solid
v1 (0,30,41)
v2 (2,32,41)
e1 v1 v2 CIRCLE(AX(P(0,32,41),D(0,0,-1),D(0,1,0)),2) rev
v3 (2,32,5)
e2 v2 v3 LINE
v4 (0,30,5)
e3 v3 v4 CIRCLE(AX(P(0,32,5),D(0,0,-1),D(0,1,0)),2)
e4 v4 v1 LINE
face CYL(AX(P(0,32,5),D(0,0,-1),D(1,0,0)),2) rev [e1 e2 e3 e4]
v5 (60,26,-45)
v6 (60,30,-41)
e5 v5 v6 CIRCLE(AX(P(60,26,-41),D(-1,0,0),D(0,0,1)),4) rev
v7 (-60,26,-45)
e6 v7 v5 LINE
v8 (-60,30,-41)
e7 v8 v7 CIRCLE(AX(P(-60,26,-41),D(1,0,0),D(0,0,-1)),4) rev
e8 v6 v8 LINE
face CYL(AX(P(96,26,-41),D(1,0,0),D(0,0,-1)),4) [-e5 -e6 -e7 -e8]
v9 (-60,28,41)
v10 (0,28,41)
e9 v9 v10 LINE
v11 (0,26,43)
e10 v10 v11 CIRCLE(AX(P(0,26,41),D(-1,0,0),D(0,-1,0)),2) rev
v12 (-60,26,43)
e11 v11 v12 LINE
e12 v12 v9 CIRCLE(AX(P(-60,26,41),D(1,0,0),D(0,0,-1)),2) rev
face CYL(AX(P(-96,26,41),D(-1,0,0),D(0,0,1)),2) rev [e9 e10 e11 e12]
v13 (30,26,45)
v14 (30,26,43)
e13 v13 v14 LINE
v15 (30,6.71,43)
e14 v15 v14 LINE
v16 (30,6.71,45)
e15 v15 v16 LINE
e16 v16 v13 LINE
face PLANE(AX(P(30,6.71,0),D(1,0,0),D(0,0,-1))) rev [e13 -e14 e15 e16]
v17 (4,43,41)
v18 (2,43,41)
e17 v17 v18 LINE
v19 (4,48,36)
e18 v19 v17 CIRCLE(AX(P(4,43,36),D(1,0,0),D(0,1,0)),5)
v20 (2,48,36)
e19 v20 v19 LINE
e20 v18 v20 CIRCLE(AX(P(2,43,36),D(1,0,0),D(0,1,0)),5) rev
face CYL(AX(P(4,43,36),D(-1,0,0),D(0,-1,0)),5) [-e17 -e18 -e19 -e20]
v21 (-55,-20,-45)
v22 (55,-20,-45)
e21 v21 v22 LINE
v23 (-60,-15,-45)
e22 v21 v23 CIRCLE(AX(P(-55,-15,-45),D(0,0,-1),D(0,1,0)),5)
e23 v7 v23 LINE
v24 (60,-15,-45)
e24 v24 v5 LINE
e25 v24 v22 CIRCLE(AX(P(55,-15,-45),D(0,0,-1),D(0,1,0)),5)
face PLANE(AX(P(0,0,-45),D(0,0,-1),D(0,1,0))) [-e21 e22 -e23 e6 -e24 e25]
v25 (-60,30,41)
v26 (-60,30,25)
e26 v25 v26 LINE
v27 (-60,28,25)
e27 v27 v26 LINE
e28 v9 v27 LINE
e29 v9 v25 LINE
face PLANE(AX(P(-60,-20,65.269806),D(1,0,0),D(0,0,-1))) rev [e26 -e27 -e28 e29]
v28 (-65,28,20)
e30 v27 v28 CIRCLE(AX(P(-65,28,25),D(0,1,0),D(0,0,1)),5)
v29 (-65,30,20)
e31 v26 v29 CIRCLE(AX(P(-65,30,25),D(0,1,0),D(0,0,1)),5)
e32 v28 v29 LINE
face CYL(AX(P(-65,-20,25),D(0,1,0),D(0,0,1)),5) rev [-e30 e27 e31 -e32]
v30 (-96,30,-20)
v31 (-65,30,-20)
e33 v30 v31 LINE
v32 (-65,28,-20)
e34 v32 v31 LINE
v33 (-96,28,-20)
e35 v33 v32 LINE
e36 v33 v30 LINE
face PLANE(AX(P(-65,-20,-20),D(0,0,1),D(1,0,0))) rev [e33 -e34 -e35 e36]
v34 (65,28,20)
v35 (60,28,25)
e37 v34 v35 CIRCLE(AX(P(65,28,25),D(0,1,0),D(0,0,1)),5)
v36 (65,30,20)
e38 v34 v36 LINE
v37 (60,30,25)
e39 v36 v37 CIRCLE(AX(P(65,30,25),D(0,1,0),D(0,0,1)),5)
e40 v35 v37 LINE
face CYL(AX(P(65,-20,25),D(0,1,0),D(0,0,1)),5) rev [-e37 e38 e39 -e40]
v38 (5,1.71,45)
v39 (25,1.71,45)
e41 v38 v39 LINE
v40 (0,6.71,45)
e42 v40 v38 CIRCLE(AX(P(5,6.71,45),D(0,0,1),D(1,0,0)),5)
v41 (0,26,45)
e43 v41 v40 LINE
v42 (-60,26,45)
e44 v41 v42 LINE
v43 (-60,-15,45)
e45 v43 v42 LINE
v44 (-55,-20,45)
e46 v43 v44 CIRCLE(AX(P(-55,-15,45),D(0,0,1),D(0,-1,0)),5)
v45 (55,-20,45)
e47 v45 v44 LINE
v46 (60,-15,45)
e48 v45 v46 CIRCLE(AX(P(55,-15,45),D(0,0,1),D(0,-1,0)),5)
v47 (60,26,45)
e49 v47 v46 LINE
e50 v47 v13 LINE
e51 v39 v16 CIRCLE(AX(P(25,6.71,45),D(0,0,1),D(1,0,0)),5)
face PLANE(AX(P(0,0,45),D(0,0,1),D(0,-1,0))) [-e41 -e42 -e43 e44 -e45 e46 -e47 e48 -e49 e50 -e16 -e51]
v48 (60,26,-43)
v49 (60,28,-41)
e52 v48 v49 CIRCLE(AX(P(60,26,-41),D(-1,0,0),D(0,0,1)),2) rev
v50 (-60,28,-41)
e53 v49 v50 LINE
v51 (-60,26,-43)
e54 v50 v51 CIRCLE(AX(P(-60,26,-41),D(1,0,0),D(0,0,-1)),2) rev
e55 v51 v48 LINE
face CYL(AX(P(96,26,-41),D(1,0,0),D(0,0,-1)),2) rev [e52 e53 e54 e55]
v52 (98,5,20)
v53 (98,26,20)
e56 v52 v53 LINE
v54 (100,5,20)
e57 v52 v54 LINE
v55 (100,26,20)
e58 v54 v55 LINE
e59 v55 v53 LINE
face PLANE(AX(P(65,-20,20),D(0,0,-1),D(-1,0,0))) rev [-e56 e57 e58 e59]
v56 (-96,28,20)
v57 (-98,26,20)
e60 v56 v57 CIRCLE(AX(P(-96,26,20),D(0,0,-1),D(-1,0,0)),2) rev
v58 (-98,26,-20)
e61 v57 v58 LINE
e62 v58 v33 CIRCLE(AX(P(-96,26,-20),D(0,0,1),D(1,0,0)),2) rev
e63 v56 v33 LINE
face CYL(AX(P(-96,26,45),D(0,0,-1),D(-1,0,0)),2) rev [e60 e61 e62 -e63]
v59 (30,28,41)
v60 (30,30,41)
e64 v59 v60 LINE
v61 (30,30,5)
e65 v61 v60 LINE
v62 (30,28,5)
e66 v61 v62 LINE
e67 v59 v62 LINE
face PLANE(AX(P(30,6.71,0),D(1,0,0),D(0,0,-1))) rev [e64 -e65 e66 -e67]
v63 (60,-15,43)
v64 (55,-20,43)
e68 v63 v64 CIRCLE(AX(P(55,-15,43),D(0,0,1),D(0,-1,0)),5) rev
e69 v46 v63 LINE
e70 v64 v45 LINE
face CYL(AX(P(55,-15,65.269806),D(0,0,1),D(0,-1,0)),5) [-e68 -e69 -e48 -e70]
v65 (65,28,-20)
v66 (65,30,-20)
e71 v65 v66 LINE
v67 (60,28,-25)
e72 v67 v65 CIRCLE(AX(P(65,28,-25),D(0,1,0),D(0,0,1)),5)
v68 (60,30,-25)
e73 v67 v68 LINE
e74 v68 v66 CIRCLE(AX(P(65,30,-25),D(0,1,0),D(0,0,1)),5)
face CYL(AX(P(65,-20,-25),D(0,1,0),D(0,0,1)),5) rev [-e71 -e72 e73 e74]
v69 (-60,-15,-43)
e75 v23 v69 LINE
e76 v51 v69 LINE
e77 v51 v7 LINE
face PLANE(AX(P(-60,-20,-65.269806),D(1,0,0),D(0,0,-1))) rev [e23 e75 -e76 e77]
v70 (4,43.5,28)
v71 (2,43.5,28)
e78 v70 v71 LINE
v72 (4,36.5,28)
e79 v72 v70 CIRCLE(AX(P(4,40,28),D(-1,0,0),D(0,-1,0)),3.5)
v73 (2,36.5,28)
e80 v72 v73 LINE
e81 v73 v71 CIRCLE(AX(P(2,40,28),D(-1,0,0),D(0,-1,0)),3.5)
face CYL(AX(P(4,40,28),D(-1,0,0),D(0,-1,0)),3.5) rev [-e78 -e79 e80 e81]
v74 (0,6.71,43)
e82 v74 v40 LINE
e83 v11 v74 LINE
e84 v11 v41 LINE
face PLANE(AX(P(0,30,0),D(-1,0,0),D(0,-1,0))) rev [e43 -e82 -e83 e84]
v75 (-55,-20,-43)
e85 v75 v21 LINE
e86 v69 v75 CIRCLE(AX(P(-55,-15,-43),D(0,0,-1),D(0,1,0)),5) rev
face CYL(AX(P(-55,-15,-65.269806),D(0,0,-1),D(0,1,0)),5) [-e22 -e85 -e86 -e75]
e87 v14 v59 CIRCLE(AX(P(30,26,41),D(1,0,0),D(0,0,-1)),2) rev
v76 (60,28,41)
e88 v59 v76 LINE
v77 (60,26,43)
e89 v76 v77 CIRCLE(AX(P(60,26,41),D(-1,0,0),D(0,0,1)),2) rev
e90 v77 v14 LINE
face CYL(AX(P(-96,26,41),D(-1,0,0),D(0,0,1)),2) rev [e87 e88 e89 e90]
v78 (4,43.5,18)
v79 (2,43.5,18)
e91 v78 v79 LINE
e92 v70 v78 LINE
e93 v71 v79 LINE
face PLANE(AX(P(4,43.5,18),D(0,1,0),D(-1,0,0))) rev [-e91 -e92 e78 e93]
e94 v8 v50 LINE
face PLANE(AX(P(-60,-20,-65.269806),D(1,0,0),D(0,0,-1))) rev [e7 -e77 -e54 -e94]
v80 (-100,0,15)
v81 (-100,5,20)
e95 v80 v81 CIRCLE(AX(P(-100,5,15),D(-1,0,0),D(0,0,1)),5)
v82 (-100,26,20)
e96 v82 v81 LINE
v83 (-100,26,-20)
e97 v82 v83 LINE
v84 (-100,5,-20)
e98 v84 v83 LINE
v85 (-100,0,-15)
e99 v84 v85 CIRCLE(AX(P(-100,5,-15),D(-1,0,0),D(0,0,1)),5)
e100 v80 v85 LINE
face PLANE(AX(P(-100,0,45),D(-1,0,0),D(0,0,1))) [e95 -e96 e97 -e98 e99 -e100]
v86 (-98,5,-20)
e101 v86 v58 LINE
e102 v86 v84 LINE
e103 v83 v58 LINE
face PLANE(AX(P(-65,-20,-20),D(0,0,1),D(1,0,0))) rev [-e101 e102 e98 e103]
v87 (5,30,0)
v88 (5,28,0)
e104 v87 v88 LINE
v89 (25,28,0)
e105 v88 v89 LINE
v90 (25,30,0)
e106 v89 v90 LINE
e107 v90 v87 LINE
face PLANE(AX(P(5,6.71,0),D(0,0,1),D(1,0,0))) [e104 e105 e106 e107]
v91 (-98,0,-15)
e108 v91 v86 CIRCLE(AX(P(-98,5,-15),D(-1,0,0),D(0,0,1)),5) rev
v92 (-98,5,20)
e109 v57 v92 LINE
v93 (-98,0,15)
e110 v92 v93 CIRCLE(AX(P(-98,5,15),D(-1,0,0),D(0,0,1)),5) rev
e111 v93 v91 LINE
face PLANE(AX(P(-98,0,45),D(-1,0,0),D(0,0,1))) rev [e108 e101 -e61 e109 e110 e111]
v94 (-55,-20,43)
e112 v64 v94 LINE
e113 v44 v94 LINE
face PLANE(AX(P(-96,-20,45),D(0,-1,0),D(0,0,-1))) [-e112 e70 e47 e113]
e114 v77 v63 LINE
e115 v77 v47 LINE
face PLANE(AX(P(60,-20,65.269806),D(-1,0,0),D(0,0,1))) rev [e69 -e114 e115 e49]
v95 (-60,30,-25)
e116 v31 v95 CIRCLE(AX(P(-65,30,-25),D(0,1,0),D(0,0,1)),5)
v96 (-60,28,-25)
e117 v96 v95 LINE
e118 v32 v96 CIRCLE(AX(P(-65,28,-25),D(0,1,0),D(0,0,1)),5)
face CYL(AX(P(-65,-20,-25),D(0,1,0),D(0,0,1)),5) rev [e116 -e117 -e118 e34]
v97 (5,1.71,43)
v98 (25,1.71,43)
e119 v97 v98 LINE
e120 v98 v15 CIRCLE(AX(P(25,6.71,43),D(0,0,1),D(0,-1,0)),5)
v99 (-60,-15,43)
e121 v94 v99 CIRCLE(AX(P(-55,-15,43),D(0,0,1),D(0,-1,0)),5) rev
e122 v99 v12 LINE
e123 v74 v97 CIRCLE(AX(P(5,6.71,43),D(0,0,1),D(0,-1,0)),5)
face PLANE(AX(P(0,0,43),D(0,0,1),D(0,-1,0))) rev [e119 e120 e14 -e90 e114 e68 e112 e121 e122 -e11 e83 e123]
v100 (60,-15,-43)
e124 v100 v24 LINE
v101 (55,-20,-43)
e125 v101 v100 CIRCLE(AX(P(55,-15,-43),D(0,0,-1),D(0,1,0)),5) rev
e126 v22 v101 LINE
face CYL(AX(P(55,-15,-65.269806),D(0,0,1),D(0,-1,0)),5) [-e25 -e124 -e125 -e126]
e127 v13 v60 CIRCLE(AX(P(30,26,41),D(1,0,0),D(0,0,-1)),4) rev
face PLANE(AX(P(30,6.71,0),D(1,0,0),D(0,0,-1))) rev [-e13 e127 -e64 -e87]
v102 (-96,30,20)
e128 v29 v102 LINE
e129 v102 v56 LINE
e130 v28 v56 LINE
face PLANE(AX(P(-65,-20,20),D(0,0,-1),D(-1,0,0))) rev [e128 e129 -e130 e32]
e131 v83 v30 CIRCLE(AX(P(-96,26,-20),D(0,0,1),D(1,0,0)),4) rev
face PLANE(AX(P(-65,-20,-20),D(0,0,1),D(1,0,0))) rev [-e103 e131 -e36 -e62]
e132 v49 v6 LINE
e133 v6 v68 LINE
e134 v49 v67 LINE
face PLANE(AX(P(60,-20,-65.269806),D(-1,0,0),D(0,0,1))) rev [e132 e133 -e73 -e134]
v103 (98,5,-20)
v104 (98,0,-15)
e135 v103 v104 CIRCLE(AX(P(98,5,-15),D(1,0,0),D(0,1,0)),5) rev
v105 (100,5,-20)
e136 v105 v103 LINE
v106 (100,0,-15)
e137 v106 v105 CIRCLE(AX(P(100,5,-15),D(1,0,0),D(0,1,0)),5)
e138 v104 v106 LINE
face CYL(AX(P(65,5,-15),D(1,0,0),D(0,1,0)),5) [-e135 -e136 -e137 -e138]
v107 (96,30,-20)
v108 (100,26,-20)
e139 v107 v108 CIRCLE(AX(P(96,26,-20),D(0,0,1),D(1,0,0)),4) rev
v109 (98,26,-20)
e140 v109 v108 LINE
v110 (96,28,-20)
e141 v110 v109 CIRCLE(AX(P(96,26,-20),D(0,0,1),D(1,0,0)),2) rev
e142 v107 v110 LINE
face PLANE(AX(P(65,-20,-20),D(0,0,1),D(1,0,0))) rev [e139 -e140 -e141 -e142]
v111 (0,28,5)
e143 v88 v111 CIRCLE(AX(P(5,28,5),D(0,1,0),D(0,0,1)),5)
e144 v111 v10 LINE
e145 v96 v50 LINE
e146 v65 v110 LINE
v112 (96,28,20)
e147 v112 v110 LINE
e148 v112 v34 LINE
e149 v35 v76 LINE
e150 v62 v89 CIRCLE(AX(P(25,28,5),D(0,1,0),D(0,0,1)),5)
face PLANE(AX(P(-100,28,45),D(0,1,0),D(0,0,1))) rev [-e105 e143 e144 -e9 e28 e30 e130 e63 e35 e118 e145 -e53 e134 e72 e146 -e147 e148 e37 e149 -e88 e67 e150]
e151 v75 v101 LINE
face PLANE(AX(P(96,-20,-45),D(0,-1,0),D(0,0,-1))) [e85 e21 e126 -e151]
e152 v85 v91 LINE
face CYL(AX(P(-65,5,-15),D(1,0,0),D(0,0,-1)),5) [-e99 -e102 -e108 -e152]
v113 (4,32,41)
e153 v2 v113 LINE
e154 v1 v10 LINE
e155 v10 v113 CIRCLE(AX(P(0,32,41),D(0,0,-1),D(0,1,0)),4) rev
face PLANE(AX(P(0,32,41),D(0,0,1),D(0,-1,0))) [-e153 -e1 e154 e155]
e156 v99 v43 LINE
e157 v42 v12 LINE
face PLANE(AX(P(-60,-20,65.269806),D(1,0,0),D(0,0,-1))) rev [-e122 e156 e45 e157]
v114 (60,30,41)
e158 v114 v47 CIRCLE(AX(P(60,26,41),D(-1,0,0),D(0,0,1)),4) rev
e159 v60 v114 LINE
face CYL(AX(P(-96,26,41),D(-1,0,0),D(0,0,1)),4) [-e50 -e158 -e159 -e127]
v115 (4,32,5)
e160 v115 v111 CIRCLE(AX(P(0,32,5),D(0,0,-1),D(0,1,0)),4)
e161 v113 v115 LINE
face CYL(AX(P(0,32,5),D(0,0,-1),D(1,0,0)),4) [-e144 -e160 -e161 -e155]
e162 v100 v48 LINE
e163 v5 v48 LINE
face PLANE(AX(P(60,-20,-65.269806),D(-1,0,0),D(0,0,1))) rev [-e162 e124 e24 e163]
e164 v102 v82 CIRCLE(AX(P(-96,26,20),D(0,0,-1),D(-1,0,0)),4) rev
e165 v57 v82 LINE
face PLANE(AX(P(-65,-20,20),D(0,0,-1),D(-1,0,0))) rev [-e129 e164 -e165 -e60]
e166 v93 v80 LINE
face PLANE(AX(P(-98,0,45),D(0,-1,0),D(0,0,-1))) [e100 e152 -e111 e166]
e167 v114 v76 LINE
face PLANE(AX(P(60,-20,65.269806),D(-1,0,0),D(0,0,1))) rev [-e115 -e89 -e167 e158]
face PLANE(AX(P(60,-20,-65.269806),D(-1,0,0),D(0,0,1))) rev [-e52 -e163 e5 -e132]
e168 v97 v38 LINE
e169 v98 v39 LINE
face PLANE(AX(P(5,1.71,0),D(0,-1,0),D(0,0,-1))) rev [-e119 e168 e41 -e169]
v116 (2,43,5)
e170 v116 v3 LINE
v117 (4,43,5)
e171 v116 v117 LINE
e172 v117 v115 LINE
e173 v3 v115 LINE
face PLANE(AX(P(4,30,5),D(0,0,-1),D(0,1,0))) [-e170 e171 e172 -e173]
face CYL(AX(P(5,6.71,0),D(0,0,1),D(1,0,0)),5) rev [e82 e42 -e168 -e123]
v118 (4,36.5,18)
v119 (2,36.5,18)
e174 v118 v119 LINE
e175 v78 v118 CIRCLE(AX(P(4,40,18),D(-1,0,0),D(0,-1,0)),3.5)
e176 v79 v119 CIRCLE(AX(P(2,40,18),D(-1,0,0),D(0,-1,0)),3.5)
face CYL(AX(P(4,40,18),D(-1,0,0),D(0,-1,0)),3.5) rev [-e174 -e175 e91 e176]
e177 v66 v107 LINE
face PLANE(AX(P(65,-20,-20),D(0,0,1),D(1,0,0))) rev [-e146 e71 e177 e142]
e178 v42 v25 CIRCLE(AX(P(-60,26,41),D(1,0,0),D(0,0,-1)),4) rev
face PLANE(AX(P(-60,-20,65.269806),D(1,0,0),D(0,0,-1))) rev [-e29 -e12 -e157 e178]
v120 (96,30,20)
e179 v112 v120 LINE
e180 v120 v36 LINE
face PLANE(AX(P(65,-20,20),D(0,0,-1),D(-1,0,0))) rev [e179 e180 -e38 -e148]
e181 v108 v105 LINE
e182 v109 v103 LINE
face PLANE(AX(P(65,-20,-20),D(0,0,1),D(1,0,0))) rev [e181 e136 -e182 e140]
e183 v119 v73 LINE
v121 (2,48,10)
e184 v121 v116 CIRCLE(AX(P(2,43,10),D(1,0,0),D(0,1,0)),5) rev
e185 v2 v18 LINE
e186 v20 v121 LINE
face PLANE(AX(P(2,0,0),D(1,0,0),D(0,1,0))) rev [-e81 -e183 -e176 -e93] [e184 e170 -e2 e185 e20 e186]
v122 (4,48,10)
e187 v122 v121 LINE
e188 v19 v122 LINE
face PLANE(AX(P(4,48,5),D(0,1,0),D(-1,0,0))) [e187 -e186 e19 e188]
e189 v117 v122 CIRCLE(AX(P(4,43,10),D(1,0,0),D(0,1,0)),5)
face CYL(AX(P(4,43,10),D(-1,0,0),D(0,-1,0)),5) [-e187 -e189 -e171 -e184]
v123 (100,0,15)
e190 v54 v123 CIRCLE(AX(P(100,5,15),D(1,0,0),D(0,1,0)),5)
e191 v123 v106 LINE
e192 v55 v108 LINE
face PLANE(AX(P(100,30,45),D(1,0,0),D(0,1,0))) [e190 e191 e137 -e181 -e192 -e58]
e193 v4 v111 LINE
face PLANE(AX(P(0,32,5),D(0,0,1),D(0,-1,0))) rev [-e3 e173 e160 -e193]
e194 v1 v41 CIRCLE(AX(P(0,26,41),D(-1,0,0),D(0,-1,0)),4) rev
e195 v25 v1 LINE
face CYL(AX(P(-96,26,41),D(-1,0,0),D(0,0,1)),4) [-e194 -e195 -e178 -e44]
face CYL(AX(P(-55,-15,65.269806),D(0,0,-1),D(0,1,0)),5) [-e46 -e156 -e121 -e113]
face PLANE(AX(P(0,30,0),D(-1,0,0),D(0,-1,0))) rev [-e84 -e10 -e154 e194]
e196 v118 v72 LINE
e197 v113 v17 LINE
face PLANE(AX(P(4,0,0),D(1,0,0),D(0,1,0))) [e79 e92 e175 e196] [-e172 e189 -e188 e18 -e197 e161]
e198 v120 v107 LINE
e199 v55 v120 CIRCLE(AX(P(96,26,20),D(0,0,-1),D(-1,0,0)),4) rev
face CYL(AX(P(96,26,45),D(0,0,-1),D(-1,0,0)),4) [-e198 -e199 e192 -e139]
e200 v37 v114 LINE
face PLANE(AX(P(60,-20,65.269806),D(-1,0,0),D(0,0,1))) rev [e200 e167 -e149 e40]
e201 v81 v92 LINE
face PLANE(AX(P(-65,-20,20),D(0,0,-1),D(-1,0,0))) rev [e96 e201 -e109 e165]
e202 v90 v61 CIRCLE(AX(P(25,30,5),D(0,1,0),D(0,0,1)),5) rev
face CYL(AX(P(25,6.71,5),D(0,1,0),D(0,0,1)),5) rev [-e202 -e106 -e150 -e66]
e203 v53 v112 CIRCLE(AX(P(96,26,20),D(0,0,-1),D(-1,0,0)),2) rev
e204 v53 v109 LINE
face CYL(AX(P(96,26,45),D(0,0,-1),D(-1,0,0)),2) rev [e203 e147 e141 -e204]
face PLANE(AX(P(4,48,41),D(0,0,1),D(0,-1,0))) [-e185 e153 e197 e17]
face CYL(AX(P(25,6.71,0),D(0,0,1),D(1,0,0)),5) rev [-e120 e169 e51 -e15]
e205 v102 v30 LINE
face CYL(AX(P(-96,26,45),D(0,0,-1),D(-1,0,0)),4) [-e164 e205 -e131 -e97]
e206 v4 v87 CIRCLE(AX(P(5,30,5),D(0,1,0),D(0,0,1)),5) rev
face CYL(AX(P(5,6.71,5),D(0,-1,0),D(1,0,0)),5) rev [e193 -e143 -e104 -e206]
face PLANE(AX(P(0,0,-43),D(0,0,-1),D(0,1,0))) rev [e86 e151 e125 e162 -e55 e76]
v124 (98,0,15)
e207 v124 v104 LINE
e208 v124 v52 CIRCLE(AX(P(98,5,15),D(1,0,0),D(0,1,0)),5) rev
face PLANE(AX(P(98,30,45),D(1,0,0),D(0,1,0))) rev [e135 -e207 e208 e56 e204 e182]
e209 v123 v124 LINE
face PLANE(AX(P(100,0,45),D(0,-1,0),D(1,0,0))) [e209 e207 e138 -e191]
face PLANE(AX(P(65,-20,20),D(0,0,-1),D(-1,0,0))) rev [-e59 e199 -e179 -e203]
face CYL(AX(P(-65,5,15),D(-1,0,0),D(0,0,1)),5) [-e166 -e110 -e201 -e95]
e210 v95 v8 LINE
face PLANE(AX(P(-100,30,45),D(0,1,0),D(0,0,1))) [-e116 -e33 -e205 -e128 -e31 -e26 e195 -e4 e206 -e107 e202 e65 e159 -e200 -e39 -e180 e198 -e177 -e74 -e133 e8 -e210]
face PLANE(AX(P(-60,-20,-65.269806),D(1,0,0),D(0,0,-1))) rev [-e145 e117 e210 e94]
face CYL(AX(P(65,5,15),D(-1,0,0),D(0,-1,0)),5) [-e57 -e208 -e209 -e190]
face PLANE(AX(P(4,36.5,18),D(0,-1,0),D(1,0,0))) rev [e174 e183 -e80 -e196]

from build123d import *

# Parameters (mm, degrees)
BASE_FLANGE1_DEPTH      = 45
EDGE_FLANGE2_START      = -100
EDGE_FLANGE2_DEPTH      = 200
EDGE_FLANGE2_2_DEPTH    = 4
EDGE_FLANGE2_START_2    = 96
EDGE_FLANGE2_3_DEPTH    = 4
EDGE_FLANGE2_START_3    = -96
EDGE_FLANGE2_4_DEPTH    = 192
EDGE_FLANGE3_START      = -100
EDGE_FLANGE3_DEPTH      = 200
EDGE_FLANGE3_2_DEPTH    = 4
EDGE_FLANGE3_START_2    = 96
EDGE_FLANGE3_3_DEPTH    = 4
EDGE_FLANGE3_START_3    = -96
EDGE_FLANGE3_4_DEPTH    = 192
CUT_EXTRUDE1_DEPTH      = 121.519707932
CUT_EXTRUDE1_DEPTH_BACK = 121.519707932
CUT_EXTRUDE2_DEPTH      = 138.840487521
CUT_EXTRUDE2_DEPTH_BACK = 45
EDGE_FLANGE4_DEPTH      = 36
FILLET1_R               = 5
CUT_EXTRUDE3_DEPTH      = 10


# Read off the part's stored shape, not the designer's step: Edge-Flange2, Edge-Flange3
# Sheet-metal steps are written as plain solids
with BuildPart() as part:
    # Sketch1 → Base-Flange1 (new, symmetric)
    with BuildSketch(Plane.XY):
        with BuildLine():
            Line((-100, 0), (-100, 26))
            ThreePointArc((-100, 26), (-98.828427125, 28.828427125), (-96, 30))
            Line((-96, 30), (96, 30))
            ThreePointArc((96, 30), (98.828427125, 28.828427125), (100, 26))
            Line((100, 26), (100, 0))
            Line((100, 0), (98, 0))
            Line((98, 0), (98, 26))
            ThreePointArc((98, 26), (97.414213562, 27.414213562), (96, 28))
            Line((96, 28), (-96, 28))
            ThreePointArc((-96, 28), (-97.414213562, 27.414213562), (-98, 26))
            Line((-98, 26), (-98, 0))
            Line((-98, 0), (-100, 0))
        make_face()
    extrude(amount=BASE_FLANGE1_DEPTH, both=True)

    # Edge-Flange2 outline → Edge-Flange2 (cut)
    with BuildSketch(Plane.YZ.offset(EDGE_FLANGE2_START)):
        with BuildLine():
            Line((26, 43), (26, 41))
            Line((26, 41), (28, 41))
            ThreePointArc((28, 41), (27.414213562, 42.414213562), (26, 43))
        make_face()
        with BuildLine():
            ThreePointArc((26, 45), (28.828427125, 43.828427125), (30, 41))
            Line((30, 41), (30, 45))
            Line((30, 45), (26, 45))
        make_face()
    extrude(amount=EDGE_FLANGE2_DEPTH, mode=Mode.SUBTRACT)

    # Edge-Flange2 2 outline → Edge-Flange2 2 (cut)
    with BuildSketch(Plane.YZ.offset(EDGE_FLANGE2_START)):
        with BuildLine():
            Line((26, 45), (26, 43))
            ThreePointArc((26, 43), (27.414213562, 42.414213562), (28, 41))
            Line((28, 41), (30, 41))
            ThreePointArc((30, 41), (28.828427125, 43.828427125), (26, 45))
        make_face()
    extrude(amount=EDGE_FLANGE2_2_DEPTH, mode=Mode.SUBTRACT)

    # Edge-Flange2 3 outline → Edge-Flange2 3 (cut)
    with BuildSketch(Plane.YZ.offset(EDGE_FLANGE2_START_2)):
        with BuildLine():
            Line((26, 45), (26, 43))
            ThreePointArc((26, 43), (27.414213562, 42.414213562), (28, 41))
            Line((28, 41), (30, 41))
            ThreePointArc((30, 41), (28.828427125, 43.828427125), (26, 45))
        make_face()
    extrude(amount=EDGE_FLANGE2_3_DEPTH, mode=Mode.SUBTRACT)

    # Edge-Flange2 4 outline → Edge-Flange2 4 (add)
    with BuildSketch(Plane.YZ.offset(EDGE_FLANGE2_START_3)):
        with BuildLine():
            Line((-20, 43), (26, 43))
            ThreePointArc((26, 43), (27.414213562, 42.414213562), (28, 41))
            Line((28, 41), (28, 44.464101616))
            ThreePointArc((28, 44.464101616), (27.03527618, 44.863703305), (26, 45))
            Line((26, 45), (-20, 45))
            Line((-20, 45), (-20, 43))
        make_face()
    extrude(amount=EDGE_FLANGE2_4_DEPTH)

    # Edge-Flange3 outline → Edge-Flange3 (cut)
    with BuildSketch(Plane.YZ.offset(EDGE_FLANGE3_START)):
        with BuildLine():
            Line((28, -41), (26, -41))
            Line((26, -41), (26, -43))
            ThreePointArc((26, -43), (27.414213562, -42.414213562), (28, -41))
        make_face()
        with BuildLine():
            Line((26, -45), (30, -45))
            Line((30, -45), (30, -41))
            ThreePointArc((30, -41), (28.828427125, -43.828427125), (26, -45))
        make_face()
    extrude(amount=EDGE_FLANGE3_DEPTH, mode=Mode.SUBTRACT)

    # Edge-Flange3 2 outline → Edge-Flange3 2 (cut)
    with BuildSketch(Plane.YZ.offset(EDGE_FLANGE3_START)):
        with BuildLine():
            ThreePointArc((28, -41), (27.414213562, -42.414213562), (26, -43))
            Line((26, -43), (26, -45))
            ThreePointArc((26, -45), (28.828427125, -43.828427125), (30, -41))
            Line((30, -41), (28, -41))
        make_face()
    extrude(amount=EDGE_FLANGE3_2_DEPTH, mode=Mode.SUBTRACT)

    # Edge-Flange3 3 outline → Edge-Flange3 3 (cut)
    with BuildSketch(Plane.YZ.offset(EDGE_FLANGE3_START_2)):
        with BuildLine():
            ThreePointArc((28, -41), (27.414213562, -42.414213562), (26, -43))
            Line((26, -43), (26, -45))
            ThreePointArc((26, -45), (28.828427125, -43.828427125), (30, -41))
            Line((30, -41), (28, -41))
        make_face()
    extrude(amount=EDGE_FLANGE3_3_DEPTH, mode=Mode.SUBTRACT)

    # Edge-Flange3 4 outline → Edge-Flange3 4 (add)
    with BuildSketch(Plane.YZ.offset(EDGE_FLANGE3_START_3)):
        with BuildLine():
            ThreePointArc((28, -41), (27.414213562, -42.414213562), (26, -43))
            Line((26, -43), (-20, -43))
            Line((-20, -43), (-20, -45))
            Line((-20, -45), (26, -45))
            ThreePointArc((26, -45), (27.03527618, -44.863703305), (28, -44.464101616))
            Line((28, -44.464101616), (28, -41))
        make_face()
    extrude(amount=EDGE_FLANGE3_4_DEPTH)

    # Sketch15 → Cut-Extrude1 (cut, two sides: drawn at the far end of the back side and taken through both)
    with BuildSketch(Plane(origin=(0, 30, 0), x_dir=(1, 0, 0), z_dir=(0, 1, 0)).offset(-CUT_EXTRUDE1_DEPTH_BACK)):
        with BuildLine():
            Line((-60, 65.269806107), (-60, 25))
            ThreePointArc((-60, 25), (-61.464466094, 21.464466094), (-65, 20))
            Line((-65, 20), (-105.792448389, 20))
            Line((-105.792448389, 20), (-105.792448389, 65.269806107))
            Line((-105.792448389, 65.269806107), (-60, 65.269806107))
        make_face()
        with BuildLine():
            Line((105.792448389, 65.269806107), (60, 65.269806107))
            Line((60, 65.269806107), (60, 25))
            ThreePointArc((60, 25), (61.464466094, 21.464466094), (65, 20))
            Line((65, 20), (105.792448389, 20))
            Line((105.792448389, 20), (105.792448389, 65.269806107))
        make_face()
        with BuildLine():
            Line((60, -65.269806107), (60, -25))
            ThreePointArc((60, -25), (61.464466094, -21.464466094), (65, -20))
            Line((65, -20), (105.792448389, -20))
            Line((105.792448389, -20), (105.792448389, -65.269806107))
            Line((105.792448389, -65.269806107), (60, -65.269806107))
        make_face()
        with BuildLine():
            Line((-105.792448389, -20), (-105.792448389, -65.269806107))
            Line((-105.792448389, -65.269806107), (-60, -65.269806107))
            Line((-60, -65.269806107), (-60, -25))
            ThreePointArc((-60, -25), (-61.464466094, -21.464466094), (-65, -20))
            Line((-65, -20), (-105.792448389, -20))
        make_face()
    extrude(amount=CUT_EXTRUDE1_DEPTH + CUT_EXTRUDE1_DEPTH_BACK, mode=Mode.SUBTRACT)

    # Sketch16 → Cut-Extrude2 (cut, two sides: drawn at the far end of the back side and taken through both)
    with BuildSketch(Plane.XY.offset(45).offset(-CUT_EXTRUDE2_DEPTH_BACK)):
        with BuildLine():
            Line((0, 30), (0, 6.71))
            ThreePointArc((0, 6.71), (1.464466094, 3.174466094), (5, 1.71))
            Line((5, 1.71), (25, 1.71))
            ThreePointArc((25, 1.71), (28.535533906, 3.174466094), (30, 6.71))
            Line((30, 6.71), (30, 30))
            Line((30, 30), (0, 30))
        make_face()
    extrude(amount=CUT_EXTRUDE2_DEPTH + CUT_EXTRUDE2_DEPTH_BACK, mode=Mode.SUBTRACT)

    # Edge-Flange4 section (across the edge) → Edge-Flange4 (add)
    with BuildSketch(Plane(origin=(2, 30, 41), x_dir=(-1, 0, 0), z_dir=(0, 0, -1))):
        with BuildLine():
            Line((-2, 2), (-2, 18))
            Line((-2, 18), (0, 18))
            Line((0, 18), (0, 2))
            ThreePointArc((0, 2), (0.585786438, 0.585786438), (2, 0))
            Line((2, 0), (2, -2))
            ThreePointArc((2, -2), (-0.828427125, -0.828427125), (-2, 2))
        make_face()
    extrude(amount=EDGE_FLANGE4_DEPTH)

    # Fillet1
    fillet1_edges = [part.edges().sort_by_distance(p)[0] for p in [
        (3, 48, 5),
        (3, 48, 41),
        (-99, 0, 20),
        (-60, -20, 44),
        (60, -20, 44),
        (99, 0, -20),
        (-60, -20, -44),
        (-99, 0, -20),
        (99, 0, 20),
        (60, -20, -44),
        (0, 29, 0),
        (30, 29, 0),
    ]]
    fillet(fillet1_edges, radius=FILLET1_R - 0.0001)  # a hair under: the kernel refuses the full size

    # Sketch21 → Cut-Extrude3 (cut)
    with BuildSketch(Plane.ZY.offset(-2)):
        with BuildLine():
            Line((18, 43.5), (28, 43.5))
            ThreePointArc((28, 43.5), (31.5, 40), (28, 36.5))
            Line((28, 36.5), (18, 36.5))
            ThreePointArc((18, 36.5), (14.5, 40), (18, 43.5))
        make_face()
    extrude(amount=-CUT_EXTRUDE3_DEPTH, mode=Mode.SUBTRACT)


solid = part.part
